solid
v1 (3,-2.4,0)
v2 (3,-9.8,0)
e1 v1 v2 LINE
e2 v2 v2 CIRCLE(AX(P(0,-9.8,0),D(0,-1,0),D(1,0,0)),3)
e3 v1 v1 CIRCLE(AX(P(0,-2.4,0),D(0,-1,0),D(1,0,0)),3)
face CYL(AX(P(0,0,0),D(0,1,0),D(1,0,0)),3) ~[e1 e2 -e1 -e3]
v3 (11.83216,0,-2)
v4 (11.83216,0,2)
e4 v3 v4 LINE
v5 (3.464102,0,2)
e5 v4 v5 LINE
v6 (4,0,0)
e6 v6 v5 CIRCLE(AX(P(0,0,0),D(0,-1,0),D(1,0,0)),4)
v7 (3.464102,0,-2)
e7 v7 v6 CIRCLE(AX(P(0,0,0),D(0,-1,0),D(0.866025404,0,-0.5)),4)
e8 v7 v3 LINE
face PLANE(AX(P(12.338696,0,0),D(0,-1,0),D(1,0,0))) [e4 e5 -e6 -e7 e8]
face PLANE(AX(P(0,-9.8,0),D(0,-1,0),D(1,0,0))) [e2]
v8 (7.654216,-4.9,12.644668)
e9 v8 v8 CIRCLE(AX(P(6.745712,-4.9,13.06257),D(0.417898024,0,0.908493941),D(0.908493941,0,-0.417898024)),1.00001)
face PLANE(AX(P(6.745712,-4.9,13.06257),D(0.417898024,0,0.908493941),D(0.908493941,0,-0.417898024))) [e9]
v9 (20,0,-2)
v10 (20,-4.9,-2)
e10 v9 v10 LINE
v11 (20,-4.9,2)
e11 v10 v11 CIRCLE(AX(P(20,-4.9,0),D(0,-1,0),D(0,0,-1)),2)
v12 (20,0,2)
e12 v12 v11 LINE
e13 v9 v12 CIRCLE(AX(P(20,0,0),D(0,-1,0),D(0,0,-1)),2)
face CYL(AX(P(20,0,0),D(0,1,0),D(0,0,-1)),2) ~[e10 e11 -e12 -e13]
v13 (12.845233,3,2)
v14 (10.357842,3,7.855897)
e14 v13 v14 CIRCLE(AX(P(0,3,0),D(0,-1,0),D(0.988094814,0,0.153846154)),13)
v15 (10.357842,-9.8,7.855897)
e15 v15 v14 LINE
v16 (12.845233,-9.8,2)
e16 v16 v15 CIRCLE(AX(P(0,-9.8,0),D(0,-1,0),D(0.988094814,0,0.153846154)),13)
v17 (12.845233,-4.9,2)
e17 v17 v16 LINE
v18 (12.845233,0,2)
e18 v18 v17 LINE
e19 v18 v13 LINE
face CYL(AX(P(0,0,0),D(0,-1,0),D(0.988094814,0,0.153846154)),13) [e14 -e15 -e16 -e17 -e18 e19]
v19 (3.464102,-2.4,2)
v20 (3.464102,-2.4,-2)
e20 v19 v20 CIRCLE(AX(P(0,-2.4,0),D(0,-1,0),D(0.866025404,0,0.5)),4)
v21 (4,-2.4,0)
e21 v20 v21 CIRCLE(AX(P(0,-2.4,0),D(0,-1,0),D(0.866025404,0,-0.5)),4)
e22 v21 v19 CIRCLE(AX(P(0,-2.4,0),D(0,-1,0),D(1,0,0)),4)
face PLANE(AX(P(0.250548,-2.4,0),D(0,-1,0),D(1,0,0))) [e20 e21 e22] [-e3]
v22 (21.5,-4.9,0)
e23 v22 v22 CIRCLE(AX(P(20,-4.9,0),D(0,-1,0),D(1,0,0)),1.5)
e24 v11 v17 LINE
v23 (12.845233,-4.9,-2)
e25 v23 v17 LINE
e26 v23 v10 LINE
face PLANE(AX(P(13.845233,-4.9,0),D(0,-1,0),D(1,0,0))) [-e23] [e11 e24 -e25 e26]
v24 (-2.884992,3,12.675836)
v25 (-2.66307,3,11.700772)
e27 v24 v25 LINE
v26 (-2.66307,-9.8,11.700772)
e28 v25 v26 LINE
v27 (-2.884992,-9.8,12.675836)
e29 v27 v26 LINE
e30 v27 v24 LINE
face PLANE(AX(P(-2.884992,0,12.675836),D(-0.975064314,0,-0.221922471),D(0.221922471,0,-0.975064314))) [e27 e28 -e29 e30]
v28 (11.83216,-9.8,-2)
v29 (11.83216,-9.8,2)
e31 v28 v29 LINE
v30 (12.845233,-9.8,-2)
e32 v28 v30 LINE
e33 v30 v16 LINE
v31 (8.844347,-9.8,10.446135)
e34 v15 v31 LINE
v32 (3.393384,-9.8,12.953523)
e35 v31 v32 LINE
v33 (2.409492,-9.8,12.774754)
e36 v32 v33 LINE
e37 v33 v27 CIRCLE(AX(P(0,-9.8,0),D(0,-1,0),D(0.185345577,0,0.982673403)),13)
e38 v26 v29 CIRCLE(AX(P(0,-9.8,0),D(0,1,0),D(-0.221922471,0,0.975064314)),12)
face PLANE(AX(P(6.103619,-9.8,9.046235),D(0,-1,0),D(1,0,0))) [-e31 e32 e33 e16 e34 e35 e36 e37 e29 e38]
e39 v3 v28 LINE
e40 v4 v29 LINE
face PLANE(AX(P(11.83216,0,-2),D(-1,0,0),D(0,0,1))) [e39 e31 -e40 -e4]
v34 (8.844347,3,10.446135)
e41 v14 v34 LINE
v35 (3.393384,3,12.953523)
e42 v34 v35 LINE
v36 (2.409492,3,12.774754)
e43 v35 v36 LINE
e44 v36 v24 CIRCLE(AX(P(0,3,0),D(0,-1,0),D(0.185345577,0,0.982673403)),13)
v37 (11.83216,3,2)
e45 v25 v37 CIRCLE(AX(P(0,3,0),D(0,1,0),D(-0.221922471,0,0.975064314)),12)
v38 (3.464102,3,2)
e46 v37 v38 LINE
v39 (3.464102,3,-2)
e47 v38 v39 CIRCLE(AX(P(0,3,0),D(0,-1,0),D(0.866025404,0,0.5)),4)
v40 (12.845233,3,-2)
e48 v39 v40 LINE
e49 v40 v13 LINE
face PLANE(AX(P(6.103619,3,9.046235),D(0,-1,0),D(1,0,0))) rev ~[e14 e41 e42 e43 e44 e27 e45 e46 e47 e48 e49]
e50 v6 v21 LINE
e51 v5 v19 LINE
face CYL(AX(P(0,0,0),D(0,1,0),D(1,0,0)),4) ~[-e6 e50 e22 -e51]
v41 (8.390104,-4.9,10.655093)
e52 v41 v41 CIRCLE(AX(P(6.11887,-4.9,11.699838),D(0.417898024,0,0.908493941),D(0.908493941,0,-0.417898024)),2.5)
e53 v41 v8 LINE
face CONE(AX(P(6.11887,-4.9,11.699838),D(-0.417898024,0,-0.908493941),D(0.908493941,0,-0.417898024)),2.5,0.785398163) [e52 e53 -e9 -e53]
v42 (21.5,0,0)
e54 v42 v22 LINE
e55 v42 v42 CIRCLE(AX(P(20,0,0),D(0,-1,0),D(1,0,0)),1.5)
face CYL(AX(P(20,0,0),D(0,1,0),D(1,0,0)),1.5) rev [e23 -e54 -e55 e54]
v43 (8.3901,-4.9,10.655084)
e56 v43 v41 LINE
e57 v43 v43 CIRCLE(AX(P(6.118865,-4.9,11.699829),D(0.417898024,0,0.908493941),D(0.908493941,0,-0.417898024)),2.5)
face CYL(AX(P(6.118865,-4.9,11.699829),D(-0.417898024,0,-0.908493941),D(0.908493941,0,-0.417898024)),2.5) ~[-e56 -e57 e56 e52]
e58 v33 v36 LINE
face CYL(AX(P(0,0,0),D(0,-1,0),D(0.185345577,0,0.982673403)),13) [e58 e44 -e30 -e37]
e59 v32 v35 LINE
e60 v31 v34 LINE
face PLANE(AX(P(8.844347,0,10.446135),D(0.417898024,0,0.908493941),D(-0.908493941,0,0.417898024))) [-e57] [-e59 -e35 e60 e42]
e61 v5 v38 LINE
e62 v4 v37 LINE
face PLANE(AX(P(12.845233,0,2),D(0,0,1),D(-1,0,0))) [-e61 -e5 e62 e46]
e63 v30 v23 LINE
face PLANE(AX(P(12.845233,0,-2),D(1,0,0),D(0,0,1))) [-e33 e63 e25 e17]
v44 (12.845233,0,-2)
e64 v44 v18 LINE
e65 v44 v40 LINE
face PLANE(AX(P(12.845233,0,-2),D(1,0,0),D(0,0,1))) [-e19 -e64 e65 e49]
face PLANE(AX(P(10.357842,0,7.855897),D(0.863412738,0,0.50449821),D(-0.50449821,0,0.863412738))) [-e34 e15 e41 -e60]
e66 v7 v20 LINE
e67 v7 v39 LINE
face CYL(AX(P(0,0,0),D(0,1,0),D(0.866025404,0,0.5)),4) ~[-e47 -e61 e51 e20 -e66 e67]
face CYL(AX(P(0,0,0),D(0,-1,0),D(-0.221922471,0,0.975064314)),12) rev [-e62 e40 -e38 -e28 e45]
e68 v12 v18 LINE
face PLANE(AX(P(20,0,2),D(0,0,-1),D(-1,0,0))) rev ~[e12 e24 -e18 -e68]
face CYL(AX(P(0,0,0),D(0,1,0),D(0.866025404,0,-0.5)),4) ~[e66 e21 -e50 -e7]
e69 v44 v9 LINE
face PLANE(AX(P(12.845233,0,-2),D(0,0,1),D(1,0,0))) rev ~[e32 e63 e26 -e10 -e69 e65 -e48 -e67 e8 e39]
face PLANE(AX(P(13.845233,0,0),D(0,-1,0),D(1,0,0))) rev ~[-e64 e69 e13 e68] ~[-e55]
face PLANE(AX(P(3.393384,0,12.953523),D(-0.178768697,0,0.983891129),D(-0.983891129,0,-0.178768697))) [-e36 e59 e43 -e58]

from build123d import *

# Parameters (mm, degrees)
F0_W      = 1.0130730125
F0_H      = 4
F1_DEPTH  = 9.8
F0_R      = 3
F2_DEPTH  = 3
F0_W_2    = 2
F0_R_2    = 1.5
F3_DEPTH  = 4.9
F4_R      = 3
F5_DEPTH  = 9.8
F6_DEPTH  = 2.4
F7_R      = 2.5
F8_DEPTH  = 1.5
F9_SIZE   = 1.49999
F10_DEPTH = 3


# Not quite as in the source:
# - a fillet or chamfer is up to 0.001 mm smaller than in the source, because OpenCascade refuses the exact size
# - a feature names something its author has since deleted; it is built from what else it names


with BuildPart() as f1:
    # F0 (on Front) → F1 (new body)
    with BuildSketch(Plane.XZ):
        with BuildLine():
            ThreePointArc((-2.6630696544, 11.7007717701), (6.6741513084, 9.9727480823), (11.8321595662, 2))
            Line((11.8321595662, 2), (12.8452325787, 2))
            ThreePointArc((12.8452325787, 2), (11.9653059951, 5.0824651934), (10.3578419044, 7.8558965804))
            ThreePointArc((10.3578419044, 7.8558965804), (6.8410523386, 11.0544110156), (2.4094924969, 12.7747542406))
            ThreePointArc((2.4094924969, 12.7747542406), (-0.2428398127, 12.99773168), (-2.8849921256, 12.6758360843))
            Line((-2.8849921256, 12.6758360843), (-2.6630696544, 11.7007717701))
        make_face()
        with Locations((12.3386960724, 0)):
            Rectangle(F0_W, F0_H)
        with BuildLine():
            ThreePointArc((2.4094924969, 12.7747542406), (6.8410523386, 11.0544110156), (10.3578419044, 7.8558965804))
            Line((10.3578419044, 7.8558965804), (8.8443472742, 10.4461347942))
            Line((8.8443472742, 10.4461347942), (3.3933836255, 12.9535229374))
            Line((3.3933836255, 12.9535229374), (2.4094924969, 12.7747542406))
        make_face()
    extrude(amount=F1_DEPTH)

    # F0 (on Front) → F2 (join)
    with BuildSketch(Plane.XZ):
        with Locations((12.3386960724, 0)):
            Rectangle(F0_W, F0_H)
        with BuildLine():
            Line((11.8321595662, 2), (3.4641016151, 2))
            ThreePointArc((3.4641016151, 2), (3.8637033052, 1.0352761804), (4, 0))
            ThreePointArc((4, 0), (3.8637033052, -1.0352761804), (3.4641016151, -2))
            Line((3.4641016151, -2), (11.8321595662, -2))
            Line((11.8321595662, -2), (11.8321595662, 2))
        make_face()
        with BuildLine():
            ThreePointArc((4, 0), (3.8637033052, 1.0352761804), (3.4641016151, 2))
            ThreePointArc((3.4641016151, 2), (-4, 0), (3.4641016151, -2))
            ThreePointArc((3.4641016151, -2), (3.8637033052, -1.0352761804), (4, 0))
        make_face()
        Circle(F0_R, mode=Mode.SUBTRACT)
        Circle(F0_R)
    extrude(amount=-F2_DEPTH)

    # F0 (on Front) → F3 (join)
    with BuildSketch(Plane.XZ):
        with Locations((13.8452325787, 0)):
            Rectangle(F0_W_2, F0_H)
        with BuildLine():
            Line((20, 2), (14.8452325787, 2))
            Line((14.8452325787, 2), (14.8452325787, -2))
            Line((14.8452325787, -2), (20, -2))
            ThreePointArc((20, -2), (22, 0), (20, 2))
        make_face()
        with Locations((20, 0)):
            Circle(F0_R_2, mode=Mode.SUBTRACT)
    extrude(amount=F3_DEPTH)

    # F4 (on face) → F5 (join)
    with BuildSketch(Plane.XZ):
        Circle(F4_R)
    extrude(amount=F5_DEPTH)

    # F4 (on face) → F6 (join)
    with BuildSketch(Plane.XZ):
        with BuildLine():
            ThreePointArc((3.4641016151, -2), (3.8637033052, -1.0352761804), (4, 0))
            ThreePointArc((4, 0), (3.8637033052, 1.0352761804), (3.4641016151, 2))
            ThreePointArc((3.4641016151, 2), (-4, 0), (3.4641016151, -2))
        make_face()
        Circle(F4_R, mode=Mode.SUBTRACT)
    extrude(amount=F6_DEPTH)

    # F7 (on face) → F8 (join)
    with BuildSketch(Plane(origin=(5.5105226193, 0, 11.9796604147), x_dir=(0.9084939414, 0, -0.4178980239), z_dir=(0.4178980239, 0, 0.9084939414))):
        with Locations((0.6696168272, -4.9)):
            Circle(F7_R)
    extrude(amount=F8_DEPTH)

    # F9 (size 1.5 in the source; OpenCascade refuses exactly that, so slightly less here)
    f9_edges = [f1.edges().sort_by_distance(p)[0] for p in [
        (4.474478, -4.9, 14.107315),
    ]]
    chamfer(f9_edges, length=F9_SIZE)

    # F10 (add): a face of the model
    f10_faces = [f1.faces().sort_by_distance(p)[0] for p in [
        (-0.2392542287, 0, 12.8058172707),
    ]]
    extrude(f10_faces, amount=F10_DEPTH)


solid = f1.part
